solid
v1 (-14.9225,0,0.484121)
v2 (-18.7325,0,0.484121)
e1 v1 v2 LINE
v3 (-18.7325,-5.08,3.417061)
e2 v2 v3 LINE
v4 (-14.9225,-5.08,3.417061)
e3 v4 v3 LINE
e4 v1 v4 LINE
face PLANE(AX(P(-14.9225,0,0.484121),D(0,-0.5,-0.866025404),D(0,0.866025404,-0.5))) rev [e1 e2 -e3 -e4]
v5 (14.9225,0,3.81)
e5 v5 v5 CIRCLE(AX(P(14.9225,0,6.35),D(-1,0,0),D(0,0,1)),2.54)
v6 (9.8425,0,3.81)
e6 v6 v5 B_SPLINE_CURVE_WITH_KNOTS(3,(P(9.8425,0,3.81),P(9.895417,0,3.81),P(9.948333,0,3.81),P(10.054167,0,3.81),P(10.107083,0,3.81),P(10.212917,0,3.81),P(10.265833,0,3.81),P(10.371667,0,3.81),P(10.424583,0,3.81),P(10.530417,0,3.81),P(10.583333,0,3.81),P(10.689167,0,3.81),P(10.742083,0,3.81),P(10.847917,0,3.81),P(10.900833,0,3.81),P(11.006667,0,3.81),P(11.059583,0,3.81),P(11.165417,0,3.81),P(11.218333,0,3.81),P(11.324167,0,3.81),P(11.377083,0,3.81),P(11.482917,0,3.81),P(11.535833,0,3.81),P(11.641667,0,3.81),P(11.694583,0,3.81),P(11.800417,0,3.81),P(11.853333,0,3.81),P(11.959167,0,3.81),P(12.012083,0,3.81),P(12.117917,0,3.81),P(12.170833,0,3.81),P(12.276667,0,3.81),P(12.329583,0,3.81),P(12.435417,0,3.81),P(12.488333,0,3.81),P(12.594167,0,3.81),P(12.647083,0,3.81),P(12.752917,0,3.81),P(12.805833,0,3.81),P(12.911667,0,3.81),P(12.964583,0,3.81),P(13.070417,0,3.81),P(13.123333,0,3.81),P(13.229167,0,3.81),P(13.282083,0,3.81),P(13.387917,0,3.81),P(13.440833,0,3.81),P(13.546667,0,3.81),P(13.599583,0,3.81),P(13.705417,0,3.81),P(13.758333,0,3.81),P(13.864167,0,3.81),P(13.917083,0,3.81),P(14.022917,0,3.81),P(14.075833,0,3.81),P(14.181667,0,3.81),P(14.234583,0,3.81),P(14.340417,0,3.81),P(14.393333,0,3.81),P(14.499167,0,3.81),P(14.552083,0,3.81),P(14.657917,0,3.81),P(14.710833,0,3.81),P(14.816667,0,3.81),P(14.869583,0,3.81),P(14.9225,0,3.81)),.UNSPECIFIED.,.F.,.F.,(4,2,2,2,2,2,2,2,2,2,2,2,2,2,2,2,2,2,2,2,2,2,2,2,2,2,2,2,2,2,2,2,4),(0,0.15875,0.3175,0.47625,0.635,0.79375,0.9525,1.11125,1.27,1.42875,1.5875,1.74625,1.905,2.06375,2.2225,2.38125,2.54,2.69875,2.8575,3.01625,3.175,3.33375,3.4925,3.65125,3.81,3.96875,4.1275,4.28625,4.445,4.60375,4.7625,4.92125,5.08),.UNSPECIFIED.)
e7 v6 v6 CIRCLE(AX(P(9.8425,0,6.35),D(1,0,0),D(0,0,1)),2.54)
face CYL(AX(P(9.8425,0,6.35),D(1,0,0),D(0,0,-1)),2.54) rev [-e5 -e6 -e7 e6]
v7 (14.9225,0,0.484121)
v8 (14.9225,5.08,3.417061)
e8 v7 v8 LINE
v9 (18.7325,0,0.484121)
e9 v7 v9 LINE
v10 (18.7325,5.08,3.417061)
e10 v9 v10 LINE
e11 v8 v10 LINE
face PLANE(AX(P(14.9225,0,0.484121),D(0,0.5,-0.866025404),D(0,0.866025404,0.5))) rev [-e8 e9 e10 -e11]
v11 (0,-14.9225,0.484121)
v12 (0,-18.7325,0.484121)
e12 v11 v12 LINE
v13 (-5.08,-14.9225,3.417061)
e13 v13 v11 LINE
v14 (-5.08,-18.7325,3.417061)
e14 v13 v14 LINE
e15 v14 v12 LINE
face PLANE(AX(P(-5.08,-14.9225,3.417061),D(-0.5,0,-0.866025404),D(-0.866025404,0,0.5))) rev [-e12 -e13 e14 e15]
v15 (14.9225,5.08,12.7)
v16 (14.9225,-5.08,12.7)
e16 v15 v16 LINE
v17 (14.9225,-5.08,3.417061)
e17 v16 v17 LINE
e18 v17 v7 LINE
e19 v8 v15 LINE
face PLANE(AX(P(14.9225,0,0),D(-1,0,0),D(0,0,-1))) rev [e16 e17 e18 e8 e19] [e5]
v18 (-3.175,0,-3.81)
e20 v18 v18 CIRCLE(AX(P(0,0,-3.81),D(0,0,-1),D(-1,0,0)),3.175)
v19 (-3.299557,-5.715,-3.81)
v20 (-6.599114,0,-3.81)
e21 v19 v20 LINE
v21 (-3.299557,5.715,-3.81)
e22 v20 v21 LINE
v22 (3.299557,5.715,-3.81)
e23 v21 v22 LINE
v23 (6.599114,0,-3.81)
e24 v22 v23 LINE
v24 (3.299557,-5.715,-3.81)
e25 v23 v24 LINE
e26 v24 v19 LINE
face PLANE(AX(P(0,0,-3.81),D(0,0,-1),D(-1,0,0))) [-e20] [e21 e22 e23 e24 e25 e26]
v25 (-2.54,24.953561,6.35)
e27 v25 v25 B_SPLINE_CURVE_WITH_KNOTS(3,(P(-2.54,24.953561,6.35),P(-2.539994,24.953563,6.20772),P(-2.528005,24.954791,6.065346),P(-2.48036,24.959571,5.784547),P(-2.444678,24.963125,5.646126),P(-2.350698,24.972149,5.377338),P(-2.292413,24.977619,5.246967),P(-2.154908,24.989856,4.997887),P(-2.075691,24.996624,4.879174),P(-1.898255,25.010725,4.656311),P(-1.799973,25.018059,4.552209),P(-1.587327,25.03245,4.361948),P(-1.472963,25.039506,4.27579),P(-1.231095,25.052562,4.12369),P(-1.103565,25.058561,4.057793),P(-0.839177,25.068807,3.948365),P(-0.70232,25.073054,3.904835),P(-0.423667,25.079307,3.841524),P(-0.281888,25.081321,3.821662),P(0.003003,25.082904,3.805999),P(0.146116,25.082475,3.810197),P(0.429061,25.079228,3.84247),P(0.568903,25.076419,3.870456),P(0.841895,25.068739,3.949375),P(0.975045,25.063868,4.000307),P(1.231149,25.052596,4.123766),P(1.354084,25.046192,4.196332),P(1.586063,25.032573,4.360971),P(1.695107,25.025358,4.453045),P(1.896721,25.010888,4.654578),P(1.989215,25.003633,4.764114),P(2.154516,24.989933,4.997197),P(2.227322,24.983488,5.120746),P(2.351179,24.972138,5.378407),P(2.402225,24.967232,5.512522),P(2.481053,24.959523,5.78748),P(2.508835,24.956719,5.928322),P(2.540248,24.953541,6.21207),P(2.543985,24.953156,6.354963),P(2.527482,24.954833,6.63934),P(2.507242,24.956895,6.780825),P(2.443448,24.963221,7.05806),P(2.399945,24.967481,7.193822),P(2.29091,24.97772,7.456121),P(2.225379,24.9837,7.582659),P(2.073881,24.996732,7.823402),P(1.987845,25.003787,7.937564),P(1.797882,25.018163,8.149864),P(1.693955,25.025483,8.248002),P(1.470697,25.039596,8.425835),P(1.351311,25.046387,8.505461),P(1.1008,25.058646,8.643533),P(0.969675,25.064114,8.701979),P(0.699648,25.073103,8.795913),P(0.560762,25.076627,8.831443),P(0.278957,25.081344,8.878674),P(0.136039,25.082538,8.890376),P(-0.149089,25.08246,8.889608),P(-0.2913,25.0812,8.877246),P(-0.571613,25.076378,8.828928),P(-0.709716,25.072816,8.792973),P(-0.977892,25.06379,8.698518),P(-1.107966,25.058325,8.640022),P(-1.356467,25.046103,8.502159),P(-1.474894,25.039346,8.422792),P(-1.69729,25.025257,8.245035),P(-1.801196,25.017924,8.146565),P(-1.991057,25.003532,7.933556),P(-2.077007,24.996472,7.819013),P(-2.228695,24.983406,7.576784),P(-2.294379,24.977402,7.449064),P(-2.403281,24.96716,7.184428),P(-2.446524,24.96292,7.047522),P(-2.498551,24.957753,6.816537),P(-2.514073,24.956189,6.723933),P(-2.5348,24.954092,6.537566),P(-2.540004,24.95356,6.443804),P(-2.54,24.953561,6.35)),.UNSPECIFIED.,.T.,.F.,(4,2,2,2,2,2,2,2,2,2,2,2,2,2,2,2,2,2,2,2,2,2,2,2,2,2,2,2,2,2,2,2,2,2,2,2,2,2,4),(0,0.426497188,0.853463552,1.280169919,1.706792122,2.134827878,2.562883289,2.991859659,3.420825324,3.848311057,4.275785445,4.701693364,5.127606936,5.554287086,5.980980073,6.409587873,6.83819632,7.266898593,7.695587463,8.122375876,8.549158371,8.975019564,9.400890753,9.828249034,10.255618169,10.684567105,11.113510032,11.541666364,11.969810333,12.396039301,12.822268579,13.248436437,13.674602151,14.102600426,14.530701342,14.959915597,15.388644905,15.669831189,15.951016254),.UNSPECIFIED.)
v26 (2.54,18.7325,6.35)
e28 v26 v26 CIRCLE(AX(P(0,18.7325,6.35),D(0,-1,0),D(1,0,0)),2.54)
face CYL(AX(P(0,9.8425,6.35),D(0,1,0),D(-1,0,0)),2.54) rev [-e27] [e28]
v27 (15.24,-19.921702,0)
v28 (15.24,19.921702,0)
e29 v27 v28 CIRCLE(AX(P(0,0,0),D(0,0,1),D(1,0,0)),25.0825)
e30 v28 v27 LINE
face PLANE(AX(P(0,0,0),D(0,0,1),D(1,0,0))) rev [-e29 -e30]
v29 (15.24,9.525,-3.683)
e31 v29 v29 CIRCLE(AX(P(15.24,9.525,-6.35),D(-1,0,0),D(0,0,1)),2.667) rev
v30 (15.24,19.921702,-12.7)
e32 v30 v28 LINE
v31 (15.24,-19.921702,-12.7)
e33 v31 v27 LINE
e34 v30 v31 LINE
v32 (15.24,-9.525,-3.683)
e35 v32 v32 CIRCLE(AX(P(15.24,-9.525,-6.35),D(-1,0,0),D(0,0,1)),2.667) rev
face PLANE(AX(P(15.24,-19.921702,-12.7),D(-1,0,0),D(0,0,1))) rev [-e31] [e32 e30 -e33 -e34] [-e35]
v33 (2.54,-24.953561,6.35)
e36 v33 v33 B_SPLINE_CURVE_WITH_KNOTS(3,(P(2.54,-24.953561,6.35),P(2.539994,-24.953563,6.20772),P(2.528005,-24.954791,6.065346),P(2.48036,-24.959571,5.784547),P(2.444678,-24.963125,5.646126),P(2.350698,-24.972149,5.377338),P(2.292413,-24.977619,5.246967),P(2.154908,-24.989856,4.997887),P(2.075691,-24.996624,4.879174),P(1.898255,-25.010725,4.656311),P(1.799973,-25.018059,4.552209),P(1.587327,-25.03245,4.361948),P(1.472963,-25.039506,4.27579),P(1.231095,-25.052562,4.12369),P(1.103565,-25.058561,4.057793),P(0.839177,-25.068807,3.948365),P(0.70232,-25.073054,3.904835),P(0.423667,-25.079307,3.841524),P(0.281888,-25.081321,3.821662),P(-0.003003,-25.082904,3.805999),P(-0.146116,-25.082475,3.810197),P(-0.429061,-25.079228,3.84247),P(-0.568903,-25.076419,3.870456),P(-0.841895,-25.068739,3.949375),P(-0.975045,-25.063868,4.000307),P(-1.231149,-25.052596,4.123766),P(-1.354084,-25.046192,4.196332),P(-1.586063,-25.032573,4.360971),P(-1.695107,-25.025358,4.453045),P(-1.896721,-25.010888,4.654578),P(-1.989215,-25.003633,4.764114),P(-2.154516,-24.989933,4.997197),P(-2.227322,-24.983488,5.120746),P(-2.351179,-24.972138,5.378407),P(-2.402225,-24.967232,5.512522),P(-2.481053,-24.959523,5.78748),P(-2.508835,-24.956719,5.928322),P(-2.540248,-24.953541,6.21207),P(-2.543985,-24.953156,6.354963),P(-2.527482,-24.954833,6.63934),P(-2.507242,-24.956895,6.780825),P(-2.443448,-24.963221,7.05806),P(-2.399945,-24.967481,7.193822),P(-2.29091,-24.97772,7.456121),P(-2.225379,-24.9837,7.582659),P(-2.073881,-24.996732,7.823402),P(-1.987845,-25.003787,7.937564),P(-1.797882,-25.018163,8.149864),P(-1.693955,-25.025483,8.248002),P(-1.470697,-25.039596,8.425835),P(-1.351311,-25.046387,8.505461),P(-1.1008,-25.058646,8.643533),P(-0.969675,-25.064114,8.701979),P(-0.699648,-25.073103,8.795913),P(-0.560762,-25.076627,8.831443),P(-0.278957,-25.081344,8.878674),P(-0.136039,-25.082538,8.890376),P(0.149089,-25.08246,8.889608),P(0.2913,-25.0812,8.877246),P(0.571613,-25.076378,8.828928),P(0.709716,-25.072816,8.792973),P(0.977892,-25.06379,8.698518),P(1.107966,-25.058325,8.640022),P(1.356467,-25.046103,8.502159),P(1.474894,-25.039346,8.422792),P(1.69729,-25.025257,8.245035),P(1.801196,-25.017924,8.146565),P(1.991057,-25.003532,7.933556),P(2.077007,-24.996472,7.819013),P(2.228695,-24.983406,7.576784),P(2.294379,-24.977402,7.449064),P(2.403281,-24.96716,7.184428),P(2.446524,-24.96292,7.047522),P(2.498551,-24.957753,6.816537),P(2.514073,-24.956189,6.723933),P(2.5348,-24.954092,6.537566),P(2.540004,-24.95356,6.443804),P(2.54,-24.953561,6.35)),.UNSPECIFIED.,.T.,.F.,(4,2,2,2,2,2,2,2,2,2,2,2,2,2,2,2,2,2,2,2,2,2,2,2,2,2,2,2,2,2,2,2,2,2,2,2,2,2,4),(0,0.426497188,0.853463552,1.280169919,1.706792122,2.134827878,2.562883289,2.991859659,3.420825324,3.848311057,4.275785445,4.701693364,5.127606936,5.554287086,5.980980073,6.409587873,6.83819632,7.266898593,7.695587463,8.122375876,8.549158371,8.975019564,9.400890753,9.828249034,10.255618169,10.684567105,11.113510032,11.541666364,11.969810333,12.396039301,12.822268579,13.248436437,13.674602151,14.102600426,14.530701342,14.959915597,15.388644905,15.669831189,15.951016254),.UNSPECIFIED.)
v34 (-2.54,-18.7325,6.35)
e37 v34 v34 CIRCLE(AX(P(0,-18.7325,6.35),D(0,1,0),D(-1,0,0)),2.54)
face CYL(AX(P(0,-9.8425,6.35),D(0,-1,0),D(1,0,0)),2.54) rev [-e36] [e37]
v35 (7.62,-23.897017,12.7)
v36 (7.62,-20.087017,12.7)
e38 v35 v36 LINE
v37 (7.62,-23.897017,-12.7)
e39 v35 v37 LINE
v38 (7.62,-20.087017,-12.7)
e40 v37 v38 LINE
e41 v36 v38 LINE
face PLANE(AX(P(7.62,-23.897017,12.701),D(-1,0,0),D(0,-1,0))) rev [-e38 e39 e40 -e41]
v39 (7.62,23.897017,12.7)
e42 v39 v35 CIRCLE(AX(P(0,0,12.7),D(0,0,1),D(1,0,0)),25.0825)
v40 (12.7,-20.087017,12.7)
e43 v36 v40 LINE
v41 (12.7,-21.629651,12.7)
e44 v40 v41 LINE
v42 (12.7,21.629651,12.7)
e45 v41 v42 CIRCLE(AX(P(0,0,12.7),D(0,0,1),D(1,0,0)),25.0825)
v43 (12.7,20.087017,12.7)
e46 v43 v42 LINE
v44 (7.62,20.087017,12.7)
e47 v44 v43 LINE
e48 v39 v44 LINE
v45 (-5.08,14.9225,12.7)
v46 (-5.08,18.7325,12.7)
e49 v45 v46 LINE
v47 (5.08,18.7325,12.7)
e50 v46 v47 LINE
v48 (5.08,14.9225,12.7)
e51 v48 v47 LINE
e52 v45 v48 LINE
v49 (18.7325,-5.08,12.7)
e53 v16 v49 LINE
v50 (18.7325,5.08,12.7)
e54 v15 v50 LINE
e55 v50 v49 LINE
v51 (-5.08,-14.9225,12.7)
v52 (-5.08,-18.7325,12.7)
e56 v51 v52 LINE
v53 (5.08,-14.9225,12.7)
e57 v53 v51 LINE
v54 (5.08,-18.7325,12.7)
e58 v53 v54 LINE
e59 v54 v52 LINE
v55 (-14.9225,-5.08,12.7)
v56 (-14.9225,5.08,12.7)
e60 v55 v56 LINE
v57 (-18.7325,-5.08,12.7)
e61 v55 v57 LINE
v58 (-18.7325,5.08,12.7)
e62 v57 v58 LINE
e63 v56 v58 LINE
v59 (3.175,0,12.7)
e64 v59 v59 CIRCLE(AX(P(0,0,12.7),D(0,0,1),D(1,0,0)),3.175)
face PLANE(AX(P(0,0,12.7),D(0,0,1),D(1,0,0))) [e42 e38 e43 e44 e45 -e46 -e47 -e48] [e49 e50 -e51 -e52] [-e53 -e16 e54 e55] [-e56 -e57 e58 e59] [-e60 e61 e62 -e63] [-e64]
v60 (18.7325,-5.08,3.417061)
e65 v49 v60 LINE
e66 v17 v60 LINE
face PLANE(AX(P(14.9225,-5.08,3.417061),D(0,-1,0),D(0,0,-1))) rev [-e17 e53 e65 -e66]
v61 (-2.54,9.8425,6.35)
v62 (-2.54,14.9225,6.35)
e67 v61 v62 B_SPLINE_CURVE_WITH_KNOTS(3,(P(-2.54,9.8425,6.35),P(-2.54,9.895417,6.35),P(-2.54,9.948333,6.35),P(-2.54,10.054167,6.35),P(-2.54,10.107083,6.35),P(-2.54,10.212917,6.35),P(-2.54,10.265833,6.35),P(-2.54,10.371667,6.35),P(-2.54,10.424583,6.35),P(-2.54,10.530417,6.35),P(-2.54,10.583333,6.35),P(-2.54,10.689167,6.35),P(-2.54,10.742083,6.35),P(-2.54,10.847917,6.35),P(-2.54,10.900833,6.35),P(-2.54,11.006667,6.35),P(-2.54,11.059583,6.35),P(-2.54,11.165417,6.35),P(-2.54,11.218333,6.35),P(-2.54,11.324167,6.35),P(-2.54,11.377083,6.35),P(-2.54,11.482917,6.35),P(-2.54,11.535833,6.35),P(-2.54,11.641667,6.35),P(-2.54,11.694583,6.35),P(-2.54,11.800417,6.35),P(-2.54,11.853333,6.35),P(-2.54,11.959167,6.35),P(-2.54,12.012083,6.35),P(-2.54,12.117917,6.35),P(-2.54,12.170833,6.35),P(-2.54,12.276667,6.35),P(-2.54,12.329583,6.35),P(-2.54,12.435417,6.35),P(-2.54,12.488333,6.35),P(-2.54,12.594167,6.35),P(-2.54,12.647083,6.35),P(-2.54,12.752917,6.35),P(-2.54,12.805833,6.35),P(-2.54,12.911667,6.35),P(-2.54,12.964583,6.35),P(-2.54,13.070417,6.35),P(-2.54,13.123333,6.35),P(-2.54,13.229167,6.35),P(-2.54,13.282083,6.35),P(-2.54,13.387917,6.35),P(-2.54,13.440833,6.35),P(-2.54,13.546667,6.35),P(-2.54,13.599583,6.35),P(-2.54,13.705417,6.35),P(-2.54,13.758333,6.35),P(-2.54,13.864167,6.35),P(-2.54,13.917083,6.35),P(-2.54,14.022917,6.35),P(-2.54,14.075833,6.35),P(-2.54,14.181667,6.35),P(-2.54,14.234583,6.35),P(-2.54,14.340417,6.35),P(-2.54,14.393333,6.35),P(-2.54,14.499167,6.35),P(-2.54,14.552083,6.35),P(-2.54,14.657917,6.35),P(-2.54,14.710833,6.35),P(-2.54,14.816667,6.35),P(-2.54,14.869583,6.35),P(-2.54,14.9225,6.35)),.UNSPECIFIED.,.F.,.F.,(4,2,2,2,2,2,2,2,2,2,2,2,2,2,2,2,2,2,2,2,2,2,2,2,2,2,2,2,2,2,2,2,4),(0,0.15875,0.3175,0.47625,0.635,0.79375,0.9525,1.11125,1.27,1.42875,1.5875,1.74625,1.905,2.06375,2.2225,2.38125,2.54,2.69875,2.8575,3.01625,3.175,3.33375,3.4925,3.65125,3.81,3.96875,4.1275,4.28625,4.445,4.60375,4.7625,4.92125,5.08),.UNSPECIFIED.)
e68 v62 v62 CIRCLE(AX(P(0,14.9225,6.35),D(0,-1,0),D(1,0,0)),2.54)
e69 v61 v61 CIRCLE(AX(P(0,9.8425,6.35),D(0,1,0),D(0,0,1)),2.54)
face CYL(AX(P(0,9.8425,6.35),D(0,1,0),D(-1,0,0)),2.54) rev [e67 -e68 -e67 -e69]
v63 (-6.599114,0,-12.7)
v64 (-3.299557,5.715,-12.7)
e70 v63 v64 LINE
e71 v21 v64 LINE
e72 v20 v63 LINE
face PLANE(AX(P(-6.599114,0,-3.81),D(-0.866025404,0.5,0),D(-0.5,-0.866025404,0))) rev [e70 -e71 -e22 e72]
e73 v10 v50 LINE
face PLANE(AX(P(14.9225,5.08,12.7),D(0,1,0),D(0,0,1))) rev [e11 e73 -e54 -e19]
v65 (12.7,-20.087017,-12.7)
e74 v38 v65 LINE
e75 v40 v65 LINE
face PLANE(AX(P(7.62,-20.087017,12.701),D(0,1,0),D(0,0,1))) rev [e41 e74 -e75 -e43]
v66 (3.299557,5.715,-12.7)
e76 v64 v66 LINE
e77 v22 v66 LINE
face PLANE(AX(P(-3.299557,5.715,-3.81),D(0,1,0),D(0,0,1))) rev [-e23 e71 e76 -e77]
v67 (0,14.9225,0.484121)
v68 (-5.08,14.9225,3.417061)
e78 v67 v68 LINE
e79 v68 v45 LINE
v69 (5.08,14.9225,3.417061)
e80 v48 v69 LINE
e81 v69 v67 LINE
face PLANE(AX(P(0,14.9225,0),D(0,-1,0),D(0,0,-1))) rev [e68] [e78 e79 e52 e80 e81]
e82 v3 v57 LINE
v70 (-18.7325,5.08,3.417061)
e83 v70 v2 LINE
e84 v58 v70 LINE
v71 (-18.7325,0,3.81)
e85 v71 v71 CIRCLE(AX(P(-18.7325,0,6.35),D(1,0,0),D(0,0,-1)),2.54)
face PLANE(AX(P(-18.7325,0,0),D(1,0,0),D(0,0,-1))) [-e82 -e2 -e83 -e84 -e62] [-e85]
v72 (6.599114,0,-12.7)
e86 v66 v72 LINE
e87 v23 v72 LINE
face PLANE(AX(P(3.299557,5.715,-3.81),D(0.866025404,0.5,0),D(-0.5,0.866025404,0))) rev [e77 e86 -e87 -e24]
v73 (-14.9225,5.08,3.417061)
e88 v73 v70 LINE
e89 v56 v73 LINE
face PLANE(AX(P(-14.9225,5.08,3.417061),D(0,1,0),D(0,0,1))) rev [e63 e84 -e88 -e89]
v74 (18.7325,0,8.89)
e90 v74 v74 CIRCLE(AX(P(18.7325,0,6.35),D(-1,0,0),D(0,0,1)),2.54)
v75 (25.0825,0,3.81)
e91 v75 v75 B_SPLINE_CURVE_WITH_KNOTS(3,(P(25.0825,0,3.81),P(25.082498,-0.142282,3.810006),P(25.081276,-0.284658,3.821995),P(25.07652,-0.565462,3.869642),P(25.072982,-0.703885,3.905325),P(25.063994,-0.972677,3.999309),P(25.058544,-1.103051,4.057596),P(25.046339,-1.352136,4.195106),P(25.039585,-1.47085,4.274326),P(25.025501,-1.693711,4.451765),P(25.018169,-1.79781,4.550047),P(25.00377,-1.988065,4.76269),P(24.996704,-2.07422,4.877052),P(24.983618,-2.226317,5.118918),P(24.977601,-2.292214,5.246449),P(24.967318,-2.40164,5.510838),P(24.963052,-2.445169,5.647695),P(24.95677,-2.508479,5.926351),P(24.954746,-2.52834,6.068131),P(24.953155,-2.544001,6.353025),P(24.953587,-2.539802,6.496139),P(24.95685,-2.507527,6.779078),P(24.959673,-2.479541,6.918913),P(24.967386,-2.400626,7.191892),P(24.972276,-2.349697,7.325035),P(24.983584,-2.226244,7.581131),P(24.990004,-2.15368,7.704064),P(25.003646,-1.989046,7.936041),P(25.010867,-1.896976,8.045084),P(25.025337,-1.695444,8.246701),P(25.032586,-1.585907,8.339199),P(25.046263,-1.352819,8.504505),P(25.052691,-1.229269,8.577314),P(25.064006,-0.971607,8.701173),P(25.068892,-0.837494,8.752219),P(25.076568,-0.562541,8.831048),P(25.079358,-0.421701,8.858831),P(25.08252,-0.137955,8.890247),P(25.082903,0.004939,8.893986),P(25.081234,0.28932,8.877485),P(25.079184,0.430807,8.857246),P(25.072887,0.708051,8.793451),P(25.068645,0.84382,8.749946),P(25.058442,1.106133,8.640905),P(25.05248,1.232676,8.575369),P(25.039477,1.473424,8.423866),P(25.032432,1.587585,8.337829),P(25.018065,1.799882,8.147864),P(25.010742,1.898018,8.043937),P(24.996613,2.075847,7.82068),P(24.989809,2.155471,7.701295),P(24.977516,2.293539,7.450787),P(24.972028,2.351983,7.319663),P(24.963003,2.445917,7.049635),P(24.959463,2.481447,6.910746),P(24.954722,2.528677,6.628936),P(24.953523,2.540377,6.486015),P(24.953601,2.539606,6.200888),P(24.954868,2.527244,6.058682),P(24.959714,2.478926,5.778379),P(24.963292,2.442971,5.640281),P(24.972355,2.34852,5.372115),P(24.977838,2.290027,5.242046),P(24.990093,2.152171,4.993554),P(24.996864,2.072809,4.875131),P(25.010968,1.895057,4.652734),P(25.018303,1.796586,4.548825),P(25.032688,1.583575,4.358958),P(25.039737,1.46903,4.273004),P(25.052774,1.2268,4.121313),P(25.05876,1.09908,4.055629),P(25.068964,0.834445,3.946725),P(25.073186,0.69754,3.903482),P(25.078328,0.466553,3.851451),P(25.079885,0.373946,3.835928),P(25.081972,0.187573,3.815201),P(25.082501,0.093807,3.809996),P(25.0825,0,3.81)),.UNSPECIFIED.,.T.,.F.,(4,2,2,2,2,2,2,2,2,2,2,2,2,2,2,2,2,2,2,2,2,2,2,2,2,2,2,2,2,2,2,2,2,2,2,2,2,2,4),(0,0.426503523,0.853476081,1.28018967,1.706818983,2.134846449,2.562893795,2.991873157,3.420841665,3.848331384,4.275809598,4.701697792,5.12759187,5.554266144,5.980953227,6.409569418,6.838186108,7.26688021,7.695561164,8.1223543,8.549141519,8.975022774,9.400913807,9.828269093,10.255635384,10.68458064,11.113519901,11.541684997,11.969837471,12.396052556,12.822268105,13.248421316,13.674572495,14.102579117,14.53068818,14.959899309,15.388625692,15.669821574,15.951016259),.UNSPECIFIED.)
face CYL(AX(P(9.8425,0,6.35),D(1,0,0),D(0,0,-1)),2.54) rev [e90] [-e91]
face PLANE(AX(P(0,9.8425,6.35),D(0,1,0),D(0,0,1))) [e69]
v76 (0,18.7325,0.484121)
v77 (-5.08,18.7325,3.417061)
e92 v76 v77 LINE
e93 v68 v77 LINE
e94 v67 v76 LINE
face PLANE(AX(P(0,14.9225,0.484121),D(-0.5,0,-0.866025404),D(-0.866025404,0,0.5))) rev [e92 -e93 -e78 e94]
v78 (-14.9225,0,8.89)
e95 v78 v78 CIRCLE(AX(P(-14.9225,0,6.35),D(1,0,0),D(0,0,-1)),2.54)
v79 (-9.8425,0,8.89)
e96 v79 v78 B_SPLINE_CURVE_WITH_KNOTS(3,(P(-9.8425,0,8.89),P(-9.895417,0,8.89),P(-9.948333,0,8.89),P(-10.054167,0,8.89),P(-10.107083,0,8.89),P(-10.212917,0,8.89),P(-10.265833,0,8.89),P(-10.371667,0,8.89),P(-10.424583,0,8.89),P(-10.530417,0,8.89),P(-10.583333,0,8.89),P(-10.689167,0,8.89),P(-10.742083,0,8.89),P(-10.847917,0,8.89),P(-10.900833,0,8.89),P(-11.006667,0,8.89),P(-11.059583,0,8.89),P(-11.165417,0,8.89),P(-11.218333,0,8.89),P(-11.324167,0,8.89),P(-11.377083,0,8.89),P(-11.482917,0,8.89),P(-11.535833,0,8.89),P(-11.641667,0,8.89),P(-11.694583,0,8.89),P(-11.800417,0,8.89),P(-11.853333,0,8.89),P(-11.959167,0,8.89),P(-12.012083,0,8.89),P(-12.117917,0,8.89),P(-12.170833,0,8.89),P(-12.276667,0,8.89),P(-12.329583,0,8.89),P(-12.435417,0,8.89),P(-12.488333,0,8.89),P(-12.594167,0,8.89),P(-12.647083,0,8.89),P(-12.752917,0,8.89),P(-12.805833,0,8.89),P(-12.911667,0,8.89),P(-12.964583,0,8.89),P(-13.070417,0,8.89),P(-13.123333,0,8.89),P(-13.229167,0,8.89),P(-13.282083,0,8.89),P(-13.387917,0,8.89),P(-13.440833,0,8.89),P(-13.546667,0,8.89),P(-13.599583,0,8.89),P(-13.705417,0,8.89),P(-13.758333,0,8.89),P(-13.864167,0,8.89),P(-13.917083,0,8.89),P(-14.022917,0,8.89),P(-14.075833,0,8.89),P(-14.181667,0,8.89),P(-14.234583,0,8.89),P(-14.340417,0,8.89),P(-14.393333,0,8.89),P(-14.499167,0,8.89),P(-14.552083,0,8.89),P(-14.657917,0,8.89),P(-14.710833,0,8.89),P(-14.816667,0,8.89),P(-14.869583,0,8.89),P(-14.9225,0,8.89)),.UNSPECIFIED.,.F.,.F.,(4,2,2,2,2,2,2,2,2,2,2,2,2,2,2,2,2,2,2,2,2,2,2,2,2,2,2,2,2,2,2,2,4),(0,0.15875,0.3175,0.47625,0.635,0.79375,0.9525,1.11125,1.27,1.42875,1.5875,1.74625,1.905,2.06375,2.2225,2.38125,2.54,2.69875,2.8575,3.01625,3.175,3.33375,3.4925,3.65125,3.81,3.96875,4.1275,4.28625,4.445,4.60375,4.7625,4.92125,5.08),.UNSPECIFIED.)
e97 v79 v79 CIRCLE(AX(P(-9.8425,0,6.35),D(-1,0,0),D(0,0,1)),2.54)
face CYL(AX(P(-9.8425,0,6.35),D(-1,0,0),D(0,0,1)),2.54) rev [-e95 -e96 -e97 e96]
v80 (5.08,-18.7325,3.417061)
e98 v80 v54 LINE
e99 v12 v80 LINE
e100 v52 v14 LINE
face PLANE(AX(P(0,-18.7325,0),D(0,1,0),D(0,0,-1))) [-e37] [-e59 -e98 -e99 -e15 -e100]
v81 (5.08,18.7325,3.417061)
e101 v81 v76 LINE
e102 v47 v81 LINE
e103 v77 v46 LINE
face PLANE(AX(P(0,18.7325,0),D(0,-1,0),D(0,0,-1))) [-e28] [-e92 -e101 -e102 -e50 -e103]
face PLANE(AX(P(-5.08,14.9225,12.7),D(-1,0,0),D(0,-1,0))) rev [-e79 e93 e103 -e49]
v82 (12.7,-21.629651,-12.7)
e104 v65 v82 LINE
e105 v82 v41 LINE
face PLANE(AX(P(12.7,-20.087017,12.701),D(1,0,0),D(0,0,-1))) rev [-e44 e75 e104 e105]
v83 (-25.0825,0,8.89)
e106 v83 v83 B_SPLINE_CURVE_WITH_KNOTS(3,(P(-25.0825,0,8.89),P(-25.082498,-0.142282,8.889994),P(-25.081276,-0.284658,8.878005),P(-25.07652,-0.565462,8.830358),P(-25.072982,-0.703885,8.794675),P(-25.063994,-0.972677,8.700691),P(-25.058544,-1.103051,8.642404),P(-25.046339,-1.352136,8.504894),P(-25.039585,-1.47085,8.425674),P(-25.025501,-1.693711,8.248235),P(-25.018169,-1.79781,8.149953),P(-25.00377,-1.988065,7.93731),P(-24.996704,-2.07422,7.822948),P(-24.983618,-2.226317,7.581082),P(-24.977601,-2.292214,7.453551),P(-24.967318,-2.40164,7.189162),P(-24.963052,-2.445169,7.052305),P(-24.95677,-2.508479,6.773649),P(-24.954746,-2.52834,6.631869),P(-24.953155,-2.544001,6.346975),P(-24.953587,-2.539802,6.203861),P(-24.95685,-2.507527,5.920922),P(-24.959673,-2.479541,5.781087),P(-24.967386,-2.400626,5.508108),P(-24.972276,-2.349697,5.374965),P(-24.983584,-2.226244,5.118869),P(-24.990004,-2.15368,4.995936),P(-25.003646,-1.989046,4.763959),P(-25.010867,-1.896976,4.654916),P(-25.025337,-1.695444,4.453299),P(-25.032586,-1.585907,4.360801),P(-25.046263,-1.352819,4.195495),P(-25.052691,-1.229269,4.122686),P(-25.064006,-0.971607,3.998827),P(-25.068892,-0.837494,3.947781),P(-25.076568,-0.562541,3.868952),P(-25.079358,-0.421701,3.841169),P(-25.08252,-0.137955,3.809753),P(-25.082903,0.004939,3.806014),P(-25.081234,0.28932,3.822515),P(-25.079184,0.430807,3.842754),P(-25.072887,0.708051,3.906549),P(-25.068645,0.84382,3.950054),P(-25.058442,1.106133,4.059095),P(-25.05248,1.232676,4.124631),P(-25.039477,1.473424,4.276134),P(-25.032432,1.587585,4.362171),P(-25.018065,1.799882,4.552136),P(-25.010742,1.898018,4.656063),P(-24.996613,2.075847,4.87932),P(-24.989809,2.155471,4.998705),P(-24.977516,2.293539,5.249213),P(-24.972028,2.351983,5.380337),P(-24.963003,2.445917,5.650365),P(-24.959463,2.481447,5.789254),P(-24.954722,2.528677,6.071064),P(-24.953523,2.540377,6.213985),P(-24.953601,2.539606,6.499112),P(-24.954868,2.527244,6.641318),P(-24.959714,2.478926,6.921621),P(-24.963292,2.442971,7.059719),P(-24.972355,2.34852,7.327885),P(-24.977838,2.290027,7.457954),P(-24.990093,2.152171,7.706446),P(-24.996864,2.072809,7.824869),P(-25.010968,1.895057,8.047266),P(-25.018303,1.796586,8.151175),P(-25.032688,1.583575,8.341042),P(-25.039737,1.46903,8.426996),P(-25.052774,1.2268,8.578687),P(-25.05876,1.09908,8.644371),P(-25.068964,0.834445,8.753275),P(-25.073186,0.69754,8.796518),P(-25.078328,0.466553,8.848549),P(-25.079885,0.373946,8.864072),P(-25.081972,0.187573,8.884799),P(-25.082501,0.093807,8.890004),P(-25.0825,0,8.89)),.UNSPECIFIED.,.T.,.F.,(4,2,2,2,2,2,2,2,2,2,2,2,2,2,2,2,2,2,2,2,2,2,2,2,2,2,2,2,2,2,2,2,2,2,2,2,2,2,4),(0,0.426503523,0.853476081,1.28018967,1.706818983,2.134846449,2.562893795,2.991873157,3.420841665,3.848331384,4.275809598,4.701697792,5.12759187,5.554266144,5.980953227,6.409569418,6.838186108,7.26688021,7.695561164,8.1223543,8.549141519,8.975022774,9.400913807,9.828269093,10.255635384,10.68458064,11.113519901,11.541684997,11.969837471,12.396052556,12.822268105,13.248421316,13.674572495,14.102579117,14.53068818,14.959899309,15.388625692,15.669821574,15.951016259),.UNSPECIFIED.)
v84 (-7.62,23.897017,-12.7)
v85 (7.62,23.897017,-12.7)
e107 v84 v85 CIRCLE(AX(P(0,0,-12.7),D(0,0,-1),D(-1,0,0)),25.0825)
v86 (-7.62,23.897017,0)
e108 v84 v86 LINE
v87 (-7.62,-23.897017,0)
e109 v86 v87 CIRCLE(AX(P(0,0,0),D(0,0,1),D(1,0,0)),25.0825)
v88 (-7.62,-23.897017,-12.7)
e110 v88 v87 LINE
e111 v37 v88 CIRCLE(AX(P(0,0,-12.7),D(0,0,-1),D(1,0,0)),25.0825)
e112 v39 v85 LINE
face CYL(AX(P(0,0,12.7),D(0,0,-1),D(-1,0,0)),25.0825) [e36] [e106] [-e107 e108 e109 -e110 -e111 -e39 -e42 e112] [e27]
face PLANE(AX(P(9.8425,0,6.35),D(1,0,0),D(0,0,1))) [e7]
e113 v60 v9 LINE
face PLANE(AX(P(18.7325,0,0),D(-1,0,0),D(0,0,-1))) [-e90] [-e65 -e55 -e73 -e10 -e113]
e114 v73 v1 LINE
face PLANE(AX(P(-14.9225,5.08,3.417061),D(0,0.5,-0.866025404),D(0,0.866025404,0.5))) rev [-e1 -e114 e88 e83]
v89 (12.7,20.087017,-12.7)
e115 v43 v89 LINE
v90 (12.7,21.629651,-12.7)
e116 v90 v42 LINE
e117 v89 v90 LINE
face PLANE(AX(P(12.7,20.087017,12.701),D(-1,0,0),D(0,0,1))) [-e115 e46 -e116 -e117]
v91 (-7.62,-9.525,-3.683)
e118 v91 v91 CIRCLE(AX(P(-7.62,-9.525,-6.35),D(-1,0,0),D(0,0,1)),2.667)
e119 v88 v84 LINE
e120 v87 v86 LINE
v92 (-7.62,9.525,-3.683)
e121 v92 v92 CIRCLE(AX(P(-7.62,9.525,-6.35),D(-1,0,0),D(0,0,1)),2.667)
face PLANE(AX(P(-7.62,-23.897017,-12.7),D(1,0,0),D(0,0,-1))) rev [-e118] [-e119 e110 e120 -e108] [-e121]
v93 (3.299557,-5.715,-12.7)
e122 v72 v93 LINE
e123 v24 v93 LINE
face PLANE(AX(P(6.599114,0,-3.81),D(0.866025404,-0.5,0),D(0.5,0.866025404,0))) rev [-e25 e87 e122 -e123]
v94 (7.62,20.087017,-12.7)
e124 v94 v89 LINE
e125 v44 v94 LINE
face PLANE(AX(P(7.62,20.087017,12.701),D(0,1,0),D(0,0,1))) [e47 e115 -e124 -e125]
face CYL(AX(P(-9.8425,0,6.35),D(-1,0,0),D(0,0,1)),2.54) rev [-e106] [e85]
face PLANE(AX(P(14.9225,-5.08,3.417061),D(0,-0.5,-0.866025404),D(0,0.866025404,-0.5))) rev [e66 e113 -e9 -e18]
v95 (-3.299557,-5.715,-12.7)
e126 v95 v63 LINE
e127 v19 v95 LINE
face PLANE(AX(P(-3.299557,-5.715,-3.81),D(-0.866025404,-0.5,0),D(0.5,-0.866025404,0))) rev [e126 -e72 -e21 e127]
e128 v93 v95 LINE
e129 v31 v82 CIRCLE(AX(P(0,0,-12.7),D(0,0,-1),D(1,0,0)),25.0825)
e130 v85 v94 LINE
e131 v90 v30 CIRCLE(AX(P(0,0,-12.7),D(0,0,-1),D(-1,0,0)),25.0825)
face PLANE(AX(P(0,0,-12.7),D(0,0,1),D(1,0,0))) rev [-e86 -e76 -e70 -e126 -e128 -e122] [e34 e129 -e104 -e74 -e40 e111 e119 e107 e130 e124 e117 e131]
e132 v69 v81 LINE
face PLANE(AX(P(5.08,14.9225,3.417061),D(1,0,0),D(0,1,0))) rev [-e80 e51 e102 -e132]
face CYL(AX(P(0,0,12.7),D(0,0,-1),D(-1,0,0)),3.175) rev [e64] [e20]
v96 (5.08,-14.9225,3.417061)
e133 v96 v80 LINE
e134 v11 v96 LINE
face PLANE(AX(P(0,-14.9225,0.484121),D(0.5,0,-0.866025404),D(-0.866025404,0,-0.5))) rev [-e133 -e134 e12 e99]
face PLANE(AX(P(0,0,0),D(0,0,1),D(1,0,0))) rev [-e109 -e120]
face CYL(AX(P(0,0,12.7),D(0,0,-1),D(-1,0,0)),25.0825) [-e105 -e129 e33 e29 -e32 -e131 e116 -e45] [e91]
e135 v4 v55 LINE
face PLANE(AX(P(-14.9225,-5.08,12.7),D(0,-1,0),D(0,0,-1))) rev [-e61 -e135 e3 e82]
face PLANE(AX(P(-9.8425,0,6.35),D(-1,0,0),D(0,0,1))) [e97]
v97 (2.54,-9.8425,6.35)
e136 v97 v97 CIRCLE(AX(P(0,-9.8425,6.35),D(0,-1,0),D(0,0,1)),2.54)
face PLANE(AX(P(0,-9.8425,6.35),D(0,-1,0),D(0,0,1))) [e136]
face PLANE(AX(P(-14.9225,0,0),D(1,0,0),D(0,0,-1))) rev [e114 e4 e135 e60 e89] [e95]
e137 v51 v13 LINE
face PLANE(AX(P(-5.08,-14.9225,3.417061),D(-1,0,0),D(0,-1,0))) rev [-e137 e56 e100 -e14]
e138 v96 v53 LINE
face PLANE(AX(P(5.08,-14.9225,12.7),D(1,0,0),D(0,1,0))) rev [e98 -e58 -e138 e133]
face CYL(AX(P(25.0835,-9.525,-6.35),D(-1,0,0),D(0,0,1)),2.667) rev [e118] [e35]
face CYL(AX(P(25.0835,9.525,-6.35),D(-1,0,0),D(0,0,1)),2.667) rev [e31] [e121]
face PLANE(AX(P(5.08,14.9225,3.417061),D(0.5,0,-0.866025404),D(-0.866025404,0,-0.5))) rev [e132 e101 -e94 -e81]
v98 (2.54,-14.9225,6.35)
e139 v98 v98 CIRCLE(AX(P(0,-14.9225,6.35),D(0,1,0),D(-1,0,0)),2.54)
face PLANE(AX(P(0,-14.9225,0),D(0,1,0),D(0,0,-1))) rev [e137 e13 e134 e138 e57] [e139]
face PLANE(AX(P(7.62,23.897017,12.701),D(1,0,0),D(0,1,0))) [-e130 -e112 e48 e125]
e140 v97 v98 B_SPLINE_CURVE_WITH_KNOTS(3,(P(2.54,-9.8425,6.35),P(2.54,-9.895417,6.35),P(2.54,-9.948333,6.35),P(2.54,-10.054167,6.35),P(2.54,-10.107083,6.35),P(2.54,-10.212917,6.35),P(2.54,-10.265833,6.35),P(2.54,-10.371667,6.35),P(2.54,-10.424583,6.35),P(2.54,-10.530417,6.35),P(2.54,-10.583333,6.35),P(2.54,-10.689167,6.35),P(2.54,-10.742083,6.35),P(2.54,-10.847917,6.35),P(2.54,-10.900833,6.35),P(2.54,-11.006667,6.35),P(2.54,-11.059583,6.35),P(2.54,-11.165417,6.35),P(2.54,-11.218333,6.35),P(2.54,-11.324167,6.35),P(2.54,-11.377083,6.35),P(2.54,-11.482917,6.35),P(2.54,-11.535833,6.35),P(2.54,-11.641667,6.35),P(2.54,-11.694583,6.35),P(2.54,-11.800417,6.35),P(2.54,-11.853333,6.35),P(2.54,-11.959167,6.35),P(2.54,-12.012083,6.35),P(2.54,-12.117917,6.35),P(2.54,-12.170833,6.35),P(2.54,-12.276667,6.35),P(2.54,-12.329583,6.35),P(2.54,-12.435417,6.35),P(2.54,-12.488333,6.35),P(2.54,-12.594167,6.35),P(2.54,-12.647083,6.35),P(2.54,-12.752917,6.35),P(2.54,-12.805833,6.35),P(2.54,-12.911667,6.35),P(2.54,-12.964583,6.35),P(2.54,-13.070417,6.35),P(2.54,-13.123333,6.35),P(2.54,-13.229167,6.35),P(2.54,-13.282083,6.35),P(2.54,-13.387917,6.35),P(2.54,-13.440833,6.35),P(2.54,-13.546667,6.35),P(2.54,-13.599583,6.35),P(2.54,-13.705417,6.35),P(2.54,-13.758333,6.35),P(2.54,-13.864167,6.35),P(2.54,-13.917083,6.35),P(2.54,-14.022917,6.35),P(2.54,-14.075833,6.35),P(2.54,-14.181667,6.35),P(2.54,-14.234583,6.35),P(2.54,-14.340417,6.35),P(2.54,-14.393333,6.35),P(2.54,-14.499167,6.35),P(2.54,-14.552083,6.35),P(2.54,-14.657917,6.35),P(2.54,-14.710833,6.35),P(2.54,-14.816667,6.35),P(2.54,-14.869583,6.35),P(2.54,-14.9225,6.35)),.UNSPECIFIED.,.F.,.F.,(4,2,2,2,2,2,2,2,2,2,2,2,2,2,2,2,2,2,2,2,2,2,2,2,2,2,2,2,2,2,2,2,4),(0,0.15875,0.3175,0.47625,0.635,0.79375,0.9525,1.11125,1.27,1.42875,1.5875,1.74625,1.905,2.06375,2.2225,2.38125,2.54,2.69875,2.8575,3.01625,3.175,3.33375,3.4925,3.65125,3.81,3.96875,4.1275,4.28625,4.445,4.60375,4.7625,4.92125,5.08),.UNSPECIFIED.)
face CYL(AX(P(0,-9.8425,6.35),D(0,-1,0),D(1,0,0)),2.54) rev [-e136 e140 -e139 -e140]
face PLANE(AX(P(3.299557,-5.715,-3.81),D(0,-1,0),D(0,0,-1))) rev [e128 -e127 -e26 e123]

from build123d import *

# Parameters (mm, degrees)
SKETCH3_R                    = 25.0825
SKETCH3_R_2                  = 3.175
BASE_DEPTH                   = 12.7
UPPER_BOLTS_CONNECTION_START = 12.7
SKETCH6_R                    = 3.175
UPPER_BOLTS_CONNECTION_DEPTH = 12.7
NUT_HOLE_DEPTH               = 8.89
UPPER_BOLTHOLES_REACH        = 45.126
SKETCH9_R                    = 2.667
NUT_RECESS_START             = -6.35
NUT_RECESS_DEPTH             = 3.81
SKETCH14_R                   = 2.54
RADIAL_BOLT_HOLE_DEPTH       = 15.24
CIRPATTERN2_COUNT            = 4
WIRE_PASSTHROUGH_REACH       = 45.628
SKETCH15_W                   = 5.08
SKETCH15_H                   = 3.81


with BuildPart() as part:
    # Sketch3 → base (new body)
    with BuildSketch(Plane(origin=(0, 0, 0), x_dir=(0, 1, 0), z_dir=(0, 0, 1))):
        Circle(SKETCH3_R)
        Circle(SKETCH3_R_2, mode=Mode.SUBTRACT)
    extrude(amount=BASE_DEPTH)

    # Sketch6 → upper_bolts_connection (add)
    with BuildSketch(Plane(origin=(0, 0, 0), x_dir=(1, 0, 0), z_dir=(0, 0, -1)).offset(UPPER_BOLTS_CONNECTION_START)):
        with BuildLine():
            Line((15.24, 19.921701891), (15.24, -19.921701891))
            ThreePointArc((15.24, -19.921701891), (4.29731101, -24.711635404), (-7.62, -23.897016681))
            Line((-7.62, -23.897016681), (-7.62, 23.897016681))
            ThreePointArc((-7.62, 23.897016681), (4.29731101, 24.711635404), (15.24, 19.921701891))
        make_face()
        Circle(SKETCH6_R, mode=Mode.SUBTRACT)
    extrude(amount=-UPPER_BOLTS_CONNECTION_DEPTH)

    # Sketch8 → nut_hole (cut)
    with BuildSketch(Plane(origin=(0, 0, -12.7), x_dir=(1, 0, 0), z_dir=(0, 0, -1))):
        Polygon((6.599113577, 0), (3.299556788, 5.715), (-3.299556788, 5.715), (-6.599113577, 0), (-3.299556788, -5.715), (3.299556788, -5.715), align=None)
    extrude(amount=-NUT_HOLE_DEPTH, mode=Mode.SUBTRACT)

    # Sketch9 → upper_boltholes (cut, up to next)
    with BuildSketch(Plane.ZY.offset(7.62), mode=Mode.PRIVATE) as upper_boltholes_sk1:
        with Locations((-6.35, -9.525)):
            Circle(SKETCH9_R)
    upper_boltholes_tool1 = extrude(upper_boltholes_sk1.sketch, amount=-UPPER_BOLTHOLES_REACH, mode=Mode.PRIVATE) & part.part
    # Sketch9 → upper_boltholes (cut, up to next)
    with BuildSketch(Plane.ZY.offset(7.62), mode=Mode.PRIVATE) as upper_boltholes_sk2:
        with Locations((-6.35, 9.525)):
            Circle(SKETCH9_R)
    upper_boltholes_tool2 = extrude(upper_boltholes_sk2.sketch, amount=-UPPER_BOLTHOLES_REACH, mode=Mode.PRIVATE) & part.part
    add(upper_boltholes_tool1.solids().sort_by_distance((-7.62, -9.525, -6.35))[0], mode=Mode.SUBTRACT)
    add(upper_boltholes_tool2.solids().sort_by_distance((-7.62, 9.525, -6.35))[0], mode=Mode.SUBTRACT)

    # Sketch13 → nut_recess (cut)
    with BuildSketch(Plane.ZY.offset(25.0825).offset(NUT_RECESS_START)):
        Polygon((3.417060633, 5.08), (0.484121265, 0), (3.417060633, -5.08), (12.7, -5.08), (12.7, 5.08), align=None)
    nut_recess = extrude(amount=-NUT_RECESS_DEPTH, mode=Mode.SUBTRACT)

    # Sketch14 → radial_bolt_hole (cut)
    with BuildSketch(Plane.ZY.offset(25.0825)):
        with Locations((6.35, 0)):
            Circle(SKETCH14_R)
    radial_bolt_hole = extrude(amount=-RADIAL_BOLT_HOLE_DEPTH, mode=Mode.SUBTRACT)

    # CirPattern2: nut_recess, radial_bolt_hole ×4 about axis
    cirpattern2_axis = Axis((0, 0, 12.7), (0, 0, -1))
    add([nut_recess.rotate(cirpattern2_axis, i * 360 / CIRPATTERN2_COUNT) for i in range(1, CIRPATTERN2_COUNT)], mode=Mode.SUBTRACT)
    add([radial_bolt_hole.rotate(cirpattern2_axis, i * 360 / CIRPATTERN2_COUNT) for i in range(1, CIRPATTERN2_COUNT)], mode=Mode.SUBTRACT)

    # Sketch15 → wire_passthrough (cut, up to next)
    with BuildSketch(Plane(origin=(0, 0, -12.7), x_dir=(1, 0, 0), z_dir=(0, 0, -1)), mode=Mode.PRIVATE) as wire_passthrough_sk1:
        with Locations((10.16, 21.992016681)):
            Rectangle(SKETCH15_W, SKETCH15_H)
    wire_passthrough_tool1 = extrude(wire_passthrough_sk1.sketch, amount=-WIRE_PASSTHROUGH_REACH, mode=Mode.PRIVATE) & part.part
    wire_passthrough = wire_passthrough_tool1.solids().sort_by_distance((10.16, -21.992017, -12.7))[0]
    add(wire_passthrough, mode=Mode.SUBTRACT)

    # wire_passthrough_mirror: wire_passthrough across plane
    add(wire_passthrough.mirror(Plane.ZX), mode=Mode.SUBTRACT)


solid = part.part
